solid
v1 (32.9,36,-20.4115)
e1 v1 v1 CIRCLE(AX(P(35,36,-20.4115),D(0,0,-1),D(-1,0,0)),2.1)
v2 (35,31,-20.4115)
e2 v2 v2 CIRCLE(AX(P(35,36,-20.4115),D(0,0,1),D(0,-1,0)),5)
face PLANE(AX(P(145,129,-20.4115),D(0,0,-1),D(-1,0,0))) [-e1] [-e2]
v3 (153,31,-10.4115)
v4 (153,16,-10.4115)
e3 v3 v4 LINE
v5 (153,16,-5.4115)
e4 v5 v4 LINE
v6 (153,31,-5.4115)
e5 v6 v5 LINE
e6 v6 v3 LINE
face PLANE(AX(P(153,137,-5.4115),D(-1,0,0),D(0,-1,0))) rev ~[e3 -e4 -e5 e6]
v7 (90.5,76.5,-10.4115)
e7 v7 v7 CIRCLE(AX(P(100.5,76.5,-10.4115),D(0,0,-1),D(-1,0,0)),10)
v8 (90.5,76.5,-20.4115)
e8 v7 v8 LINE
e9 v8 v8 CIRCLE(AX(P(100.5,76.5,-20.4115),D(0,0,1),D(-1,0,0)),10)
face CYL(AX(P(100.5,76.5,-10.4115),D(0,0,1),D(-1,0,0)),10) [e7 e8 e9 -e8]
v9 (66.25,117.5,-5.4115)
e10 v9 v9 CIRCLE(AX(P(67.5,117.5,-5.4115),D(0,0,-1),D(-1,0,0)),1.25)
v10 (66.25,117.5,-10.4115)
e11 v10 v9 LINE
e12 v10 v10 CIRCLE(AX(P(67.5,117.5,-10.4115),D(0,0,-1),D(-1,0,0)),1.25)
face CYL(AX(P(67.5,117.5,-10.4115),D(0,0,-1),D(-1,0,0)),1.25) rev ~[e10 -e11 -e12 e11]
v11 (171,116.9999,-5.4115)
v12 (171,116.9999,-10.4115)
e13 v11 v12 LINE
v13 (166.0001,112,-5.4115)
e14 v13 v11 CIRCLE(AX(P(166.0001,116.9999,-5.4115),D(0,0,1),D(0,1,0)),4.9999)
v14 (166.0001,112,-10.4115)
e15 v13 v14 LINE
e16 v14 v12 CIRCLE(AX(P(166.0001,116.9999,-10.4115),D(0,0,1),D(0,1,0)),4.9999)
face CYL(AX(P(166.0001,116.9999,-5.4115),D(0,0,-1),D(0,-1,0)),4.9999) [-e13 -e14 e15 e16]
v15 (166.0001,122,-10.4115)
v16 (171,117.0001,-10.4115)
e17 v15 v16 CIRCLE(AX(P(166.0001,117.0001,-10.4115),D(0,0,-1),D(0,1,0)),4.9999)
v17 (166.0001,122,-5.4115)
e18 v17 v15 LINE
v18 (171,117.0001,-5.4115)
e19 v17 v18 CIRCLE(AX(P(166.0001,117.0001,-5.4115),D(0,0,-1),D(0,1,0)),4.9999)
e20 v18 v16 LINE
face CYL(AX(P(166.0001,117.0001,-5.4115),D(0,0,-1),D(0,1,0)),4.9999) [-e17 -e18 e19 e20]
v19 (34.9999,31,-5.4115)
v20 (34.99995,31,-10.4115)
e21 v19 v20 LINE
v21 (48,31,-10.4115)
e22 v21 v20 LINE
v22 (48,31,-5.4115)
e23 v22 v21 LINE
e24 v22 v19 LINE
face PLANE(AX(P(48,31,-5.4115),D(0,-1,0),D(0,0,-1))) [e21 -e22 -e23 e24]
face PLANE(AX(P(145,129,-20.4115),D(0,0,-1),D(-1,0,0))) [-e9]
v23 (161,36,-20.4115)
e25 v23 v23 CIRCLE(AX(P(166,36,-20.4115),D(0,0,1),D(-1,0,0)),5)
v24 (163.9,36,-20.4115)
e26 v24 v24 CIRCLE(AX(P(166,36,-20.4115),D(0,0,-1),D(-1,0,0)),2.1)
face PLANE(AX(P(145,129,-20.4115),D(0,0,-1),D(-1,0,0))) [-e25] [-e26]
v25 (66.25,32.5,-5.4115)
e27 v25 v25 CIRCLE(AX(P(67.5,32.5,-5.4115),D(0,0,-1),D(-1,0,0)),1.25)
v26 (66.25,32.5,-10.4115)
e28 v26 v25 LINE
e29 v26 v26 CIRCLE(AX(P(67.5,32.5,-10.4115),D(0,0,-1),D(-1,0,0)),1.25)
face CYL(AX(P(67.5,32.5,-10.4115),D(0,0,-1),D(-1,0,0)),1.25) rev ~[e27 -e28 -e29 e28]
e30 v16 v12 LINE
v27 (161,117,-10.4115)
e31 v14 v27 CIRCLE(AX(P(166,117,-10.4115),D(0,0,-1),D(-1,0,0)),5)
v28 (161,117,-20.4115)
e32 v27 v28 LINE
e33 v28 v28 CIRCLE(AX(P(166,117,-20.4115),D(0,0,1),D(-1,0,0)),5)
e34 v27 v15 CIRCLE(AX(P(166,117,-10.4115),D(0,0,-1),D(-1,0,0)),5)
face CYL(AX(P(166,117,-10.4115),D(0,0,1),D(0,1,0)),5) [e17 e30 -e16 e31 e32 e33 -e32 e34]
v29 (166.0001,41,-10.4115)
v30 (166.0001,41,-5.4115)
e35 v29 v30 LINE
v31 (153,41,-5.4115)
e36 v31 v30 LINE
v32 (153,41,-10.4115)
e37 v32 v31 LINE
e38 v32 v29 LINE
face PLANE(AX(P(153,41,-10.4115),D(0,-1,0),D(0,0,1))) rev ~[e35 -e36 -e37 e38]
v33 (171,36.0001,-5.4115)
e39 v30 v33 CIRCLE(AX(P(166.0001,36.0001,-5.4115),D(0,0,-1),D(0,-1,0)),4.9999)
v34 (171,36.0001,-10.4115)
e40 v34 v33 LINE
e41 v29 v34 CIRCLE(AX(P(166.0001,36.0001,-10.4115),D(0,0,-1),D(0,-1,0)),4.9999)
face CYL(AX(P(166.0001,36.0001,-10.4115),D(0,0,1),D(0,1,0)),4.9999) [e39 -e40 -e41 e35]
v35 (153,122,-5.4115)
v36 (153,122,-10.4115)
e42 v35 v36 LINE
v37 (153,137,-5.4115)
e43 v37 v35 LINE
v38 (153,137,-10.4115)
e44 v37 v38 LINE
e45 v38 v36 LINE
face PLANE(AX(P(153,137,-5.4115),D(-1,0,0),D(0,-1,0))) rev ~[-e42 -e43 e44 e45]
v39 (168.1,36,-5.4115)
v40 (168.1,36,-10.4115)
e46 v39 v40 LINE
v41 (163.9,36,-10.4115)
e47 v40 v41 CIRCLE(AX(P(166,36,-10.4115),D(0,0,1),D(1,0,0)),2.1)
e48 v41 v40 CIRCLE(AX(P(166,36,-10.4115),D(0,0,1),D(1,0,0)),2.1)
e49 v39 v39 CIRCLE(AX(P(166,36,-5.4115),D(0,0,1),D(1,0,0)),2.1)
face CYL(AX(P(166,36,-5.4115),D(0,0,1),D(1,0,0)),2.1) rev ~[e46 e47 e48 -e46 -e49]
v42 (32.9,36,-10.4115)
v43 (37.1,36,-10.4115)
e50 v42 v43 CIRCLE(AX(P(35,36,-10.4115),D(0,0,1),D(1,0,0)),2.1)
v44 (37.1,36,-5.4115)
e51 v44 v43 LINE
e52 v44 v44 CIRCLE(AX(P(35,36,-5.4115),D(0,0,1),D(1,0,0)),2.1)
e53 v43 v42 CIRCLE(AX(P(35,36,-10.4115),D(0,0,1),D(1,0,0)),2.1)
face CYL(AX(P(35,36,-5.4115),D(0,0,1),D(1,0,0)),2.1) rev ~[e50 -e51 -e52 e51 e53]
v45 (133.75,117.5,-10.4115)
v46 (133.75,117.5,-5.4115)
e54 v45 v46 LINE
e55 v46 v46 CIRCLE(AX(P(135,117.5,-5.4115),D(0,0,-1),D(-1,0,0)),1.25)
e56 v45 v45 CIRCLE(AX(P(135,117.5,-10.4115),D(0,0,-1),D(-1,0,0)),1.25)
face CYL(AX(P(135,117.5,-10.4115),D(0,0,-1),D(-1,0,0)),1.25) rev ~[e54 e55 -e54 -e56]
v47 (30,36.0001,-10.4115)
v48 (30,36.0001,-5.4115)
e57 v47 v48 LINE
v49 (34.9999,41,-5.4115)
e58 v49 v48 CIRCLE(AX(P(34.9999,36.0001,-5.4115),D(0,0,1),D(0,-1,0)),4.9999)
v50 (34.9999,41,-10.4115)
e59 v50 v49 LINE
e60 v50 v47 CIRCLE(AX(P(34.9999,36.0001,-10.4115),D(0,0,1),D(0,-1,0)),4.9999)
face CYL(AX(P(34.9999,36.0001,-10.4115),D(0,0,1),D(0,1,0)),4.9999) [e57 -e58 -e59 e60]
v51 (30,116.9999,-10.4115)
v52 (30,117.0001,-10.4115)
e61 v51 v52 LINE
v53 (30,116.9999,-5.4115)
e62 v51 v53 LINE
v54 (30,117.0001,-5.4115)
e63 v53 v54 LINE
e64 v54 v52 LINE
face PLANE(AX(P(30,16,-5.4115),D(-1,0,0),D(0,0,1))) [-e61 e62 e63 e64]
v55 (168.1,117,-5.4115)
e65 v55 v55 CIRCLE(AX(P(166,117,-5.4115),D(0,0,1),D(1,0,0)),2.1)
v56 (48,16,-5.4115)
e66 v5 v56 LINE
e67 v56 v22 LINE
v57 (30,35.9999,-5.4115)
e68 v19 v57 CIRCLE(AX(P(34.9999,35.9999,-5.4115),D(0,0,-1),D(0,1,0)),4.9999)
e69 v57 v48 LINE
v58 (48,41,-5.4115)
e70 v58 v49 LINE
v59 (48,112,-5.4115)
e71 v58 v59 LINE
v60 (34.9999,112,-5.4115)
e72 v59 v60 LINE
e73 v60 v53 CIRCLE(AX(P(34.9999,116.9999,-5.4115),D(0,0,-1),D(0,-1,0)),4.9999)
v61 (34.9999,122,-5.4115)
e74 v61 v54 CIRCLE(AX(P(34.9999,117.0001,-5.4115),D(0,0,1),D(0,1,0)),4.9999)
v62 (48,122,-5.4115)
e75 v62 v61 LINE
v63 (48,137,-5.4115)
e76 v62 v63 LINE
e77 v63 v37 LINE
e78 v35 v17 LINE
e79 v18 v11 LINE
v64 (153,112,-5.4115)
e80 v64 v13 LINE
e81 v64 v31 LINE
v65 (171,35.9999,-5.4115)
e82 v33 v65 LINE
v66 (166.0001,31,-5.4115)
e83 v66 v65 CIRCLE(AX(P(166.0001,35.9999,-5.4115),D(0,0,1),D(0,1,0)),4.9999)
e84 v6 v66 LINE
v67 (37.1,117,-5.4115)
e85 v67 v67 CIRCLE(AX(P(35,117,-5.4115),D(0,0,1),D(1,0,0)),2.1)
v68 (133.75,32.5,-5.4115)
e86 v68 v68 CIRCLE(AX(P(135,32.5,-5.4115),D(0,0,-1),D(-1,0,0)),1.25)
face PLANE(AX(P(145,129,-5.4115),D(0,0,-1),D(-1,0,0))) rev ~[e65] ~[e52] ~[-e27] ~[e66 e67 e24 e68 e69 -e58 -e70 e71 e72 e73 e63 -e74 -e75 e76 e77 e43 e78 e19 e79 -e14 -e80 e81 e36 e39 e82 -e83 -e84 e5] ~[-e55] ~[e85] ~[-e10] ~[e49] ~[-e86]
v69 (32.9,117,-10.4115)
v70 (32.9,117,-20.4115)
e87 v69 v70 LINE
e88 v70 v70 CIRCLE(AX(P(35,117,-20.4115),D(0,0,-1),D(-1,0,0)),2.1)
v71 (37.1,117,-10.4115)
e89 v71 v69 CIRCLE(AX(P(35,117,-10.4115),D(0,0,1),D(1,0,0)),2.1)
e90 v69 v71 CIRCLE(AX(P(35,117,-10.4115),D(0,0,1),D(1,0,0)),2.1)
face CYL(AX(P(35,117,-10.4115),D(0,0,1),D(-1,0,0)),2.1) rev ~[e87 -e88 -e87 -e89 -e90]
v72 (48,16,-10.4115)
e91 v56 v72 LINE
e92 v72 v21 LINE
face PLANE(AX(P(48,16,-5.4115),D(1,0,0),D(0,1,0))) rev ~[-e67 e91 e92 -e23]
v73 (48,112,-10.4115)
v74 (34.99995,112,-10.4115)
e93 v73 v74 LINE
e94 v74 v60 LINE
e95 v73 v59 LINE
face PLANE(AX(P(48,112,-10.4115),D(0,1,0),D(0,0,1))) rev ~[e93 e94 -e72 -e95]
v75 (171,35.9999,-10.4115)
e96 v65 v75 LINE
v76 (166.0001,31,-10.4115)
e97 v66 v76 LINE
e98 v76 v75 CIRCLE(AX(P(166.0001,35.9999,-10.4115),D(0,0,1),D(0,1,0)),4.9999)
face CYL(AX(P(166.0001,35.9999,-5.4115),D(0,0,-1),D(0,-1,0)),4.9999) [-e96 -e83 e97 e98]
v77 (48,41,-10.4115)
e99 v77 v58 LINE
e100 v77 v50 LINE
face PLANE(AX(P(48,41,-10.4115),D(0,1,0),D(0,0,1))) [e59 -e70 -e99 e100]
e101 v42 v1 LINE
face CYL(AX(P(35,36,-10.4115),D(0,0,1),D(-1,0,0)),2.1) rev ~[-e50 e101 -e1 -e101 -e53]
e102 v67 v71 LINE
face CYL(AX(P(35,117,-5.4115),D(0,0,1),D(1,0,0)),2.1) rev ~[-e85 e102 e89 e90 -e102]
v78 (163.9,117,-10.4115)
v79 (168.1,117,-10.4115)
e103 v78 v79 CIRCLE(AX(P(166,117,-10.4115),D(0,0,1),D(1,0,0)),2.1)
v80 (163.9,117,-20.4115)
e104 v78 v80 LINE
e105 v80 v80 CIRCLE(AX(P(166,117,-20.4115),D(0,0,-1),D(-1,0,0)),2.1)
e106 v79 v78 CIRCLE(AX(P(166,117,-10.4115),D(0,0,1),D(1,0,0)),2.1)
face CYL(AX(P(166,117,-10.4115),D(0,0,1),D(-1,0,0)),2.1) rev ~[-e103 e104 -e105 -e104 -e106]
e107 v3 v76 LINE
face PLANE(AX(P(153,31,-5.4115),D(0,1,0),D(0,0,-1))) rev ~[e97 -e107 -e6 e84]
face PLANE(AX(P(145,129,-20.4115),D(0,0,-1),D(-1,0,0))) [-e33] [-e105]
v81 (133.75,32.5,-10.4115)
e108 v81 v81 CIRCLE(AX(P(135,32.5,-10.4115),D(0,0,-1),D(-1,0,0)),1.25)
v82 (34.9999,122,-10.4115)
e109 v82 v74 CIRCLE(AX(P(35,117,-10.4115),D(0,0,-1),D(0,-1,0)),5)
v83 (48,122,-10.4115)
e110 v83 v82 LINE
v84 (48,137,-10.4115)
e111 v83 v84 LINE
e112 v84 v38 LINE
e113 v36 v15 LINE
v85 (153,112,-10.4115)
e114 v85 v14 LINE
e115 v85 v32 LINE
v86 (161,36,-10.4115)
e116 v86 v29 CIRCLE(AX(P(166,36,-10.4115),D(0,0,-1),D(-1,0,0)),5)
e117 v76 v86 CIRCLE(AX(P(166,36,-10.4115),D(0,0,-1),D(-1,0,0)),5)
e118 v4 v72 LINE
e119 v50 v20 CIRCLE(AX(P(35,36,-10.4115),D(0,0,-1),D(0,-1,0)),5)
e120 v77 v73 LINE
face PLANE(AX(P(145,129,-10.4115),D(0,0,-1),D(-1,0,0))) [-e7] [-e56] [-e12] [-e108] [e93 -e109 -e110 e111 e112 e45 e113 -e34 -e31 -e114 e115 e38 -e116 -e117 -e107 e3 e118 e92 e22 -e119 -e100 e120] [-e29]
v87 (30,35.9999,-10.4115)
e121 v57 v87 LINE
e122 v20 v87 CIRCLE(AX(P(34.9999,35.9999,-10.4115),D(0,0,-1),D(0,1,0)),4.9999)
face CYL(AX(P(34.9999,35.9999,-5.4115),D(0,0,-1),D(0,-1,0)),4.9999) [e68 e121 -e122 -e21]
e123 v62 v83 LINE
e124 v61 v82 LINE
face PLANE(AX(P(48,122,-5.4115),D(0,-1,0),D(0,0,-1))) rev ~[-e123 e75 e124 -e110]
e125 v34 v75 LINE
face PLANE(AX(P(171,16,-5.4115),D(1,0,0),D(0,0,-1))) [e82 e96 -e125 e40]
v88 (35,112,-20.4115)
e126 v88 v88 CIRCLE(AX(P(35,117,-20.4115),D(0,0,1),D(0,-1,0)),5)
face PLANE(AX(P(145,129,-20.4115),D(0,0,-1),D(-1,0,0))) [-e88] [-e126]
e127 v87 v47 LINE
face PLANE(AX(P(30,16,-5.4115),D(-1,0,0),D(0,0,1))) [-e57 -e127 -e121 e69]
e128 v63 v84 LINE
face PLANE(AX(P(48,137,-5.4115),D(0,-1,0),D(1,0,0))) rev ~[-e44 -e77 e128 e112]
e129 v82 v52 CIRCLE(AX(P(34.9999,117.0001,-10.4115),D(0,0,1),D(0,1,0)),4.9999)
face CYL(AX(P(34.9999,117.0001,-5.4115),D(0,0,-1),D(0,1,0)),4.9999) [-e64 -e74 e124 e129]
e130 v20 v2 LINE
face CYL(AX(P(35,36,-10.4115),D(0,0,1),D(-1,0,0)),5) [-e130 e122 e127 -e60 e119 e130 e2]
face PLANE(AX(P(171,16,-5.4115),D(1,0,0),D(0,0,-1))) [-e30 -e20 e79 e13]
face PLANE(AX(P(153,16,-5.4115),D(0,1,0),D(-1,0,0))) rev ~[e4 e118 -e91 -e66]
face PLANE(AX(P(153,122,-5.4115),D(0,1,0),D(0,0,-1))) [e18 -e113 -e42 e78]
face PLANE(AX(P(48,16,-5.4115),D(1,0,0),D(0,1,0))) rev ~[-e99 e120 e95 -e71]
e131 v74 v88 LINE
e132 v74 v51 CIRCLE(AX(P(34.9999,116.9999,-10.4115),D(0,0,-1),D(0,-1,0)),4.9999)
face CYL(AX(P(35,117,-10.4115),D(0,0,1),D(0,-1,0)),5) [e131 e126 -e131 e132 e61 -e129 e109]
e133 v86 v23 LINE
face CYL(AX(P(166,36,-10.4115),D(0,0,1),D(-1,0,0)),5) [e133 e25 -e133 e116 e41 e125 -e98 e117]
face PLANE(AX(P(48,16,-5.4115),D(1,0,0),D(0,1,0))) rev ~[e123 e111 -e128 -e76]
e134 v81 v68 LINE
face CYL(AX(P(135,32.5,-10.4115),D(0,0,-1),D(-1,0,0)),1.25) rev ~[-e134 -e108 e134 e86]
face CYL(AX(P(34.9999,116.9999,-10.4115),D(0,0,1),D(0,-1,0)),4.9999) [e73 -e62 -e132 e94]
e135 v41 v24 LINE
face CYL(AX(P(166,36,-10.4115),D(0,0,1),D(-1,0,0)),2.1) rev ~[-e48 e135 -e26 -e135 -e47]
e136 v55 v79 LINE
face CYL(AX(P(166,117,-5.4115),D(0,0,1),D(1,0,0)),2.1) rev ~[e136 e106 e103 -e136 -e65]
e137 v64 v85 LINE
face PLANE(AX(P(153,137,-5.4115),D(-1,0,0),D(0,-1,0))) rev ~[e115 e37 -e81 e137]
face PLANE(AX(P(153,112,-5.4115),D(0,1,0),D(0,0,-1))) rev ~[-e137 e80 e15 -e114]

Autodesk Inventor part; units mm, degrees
ref_plane "YZ Plane" through (0, 0, 0) normal (1, 0, 0) x (0, 1, 0)
ref_plane "XZ Plane" through (0, 0, 0) normal (0, 1, 0) x (-1, 0, 0)
ref_plane "XY Plane" through (0, 0, 0) normal (0, 0, 1) x (1, 0, 0)
ref_plane "Arbeitsebene1" through (145, 129, -5.4115) normal (0, 0, -1) x (-1, 0, 0)
sketch "Skizze1" plane through (145, 129, -5.4115) normal (0, 0, -1) x (-1, 0, 0)
  line L0 (0, -105) -> (89, -105) projected
  line L1 (89, -105) -> (89, 0) projected
  line L2 (0, 0) -> (0, -105) projected
  line L3 (89, 0) -> (0, 0) projected
  line L4 (89, -105) -> (0, 0)
  line L5 (0, -105) -> (89, 0)
  line L6 (97, 8) -> (-8, 8)
  line L7 (-8, 8) -> (-8, -113)
  line L8 (-8, -113) -> (97, -113)
  line L9 (97, -113) -> (97, 8)
  line L10 (97, 8) -> (-8, -113) construction
  line L11 (-8, 8) -> (97, -113) construction
  point P0 (145, -129)
  point P1 (44.5, -52.5)
  dimension "d1" = 105
  dimension "d2" = 121
extrude "Extrusion1" add sketch "Skizze1" along normal blind 5 contours L5 L4 L0 | L2 L4 L5 | L4 L5 L1 | L3 L5 L4 | L9 L8 L7 L6
sketch "Skizze3" plane through (145, 129, -10.4115) normal (0, 0, -1) x (-1, 0, 0)
  circle A0 centre (10, -96.5) radius 1 projected
  circle A1 centre (10, -11.5) radius 1 projected
  circle A2 centre (77.5, -96.5) radius 1 projected
  circle A3 centre (77.5, -11.5) radius 1 projected
  circle A4 centre (77.5, -11.5) radius 4 projected
  circle A5 centre (77.5, -11.5) radius 1.25
  circle A6 centre (77.5, -96.5) radius 4 projected
  circle A7 centre (77.5, -96.5) radius 1.25
  circle A8 centre (10, -96.5) radius 1.25
  circle A9 centre (10, -11.5) radius 1.25
  point P0 (145, -129)
  dimension "d12" = 2.5
  dimension "d13" = 2.5
  dimension "d14" = 2.5
  dimension "d15" = 2.5
extrude "Extrusion3" cut sketch "Skizze3" against normal blind 25.25 contours A0 | A1 | A2 | A3 | A5 | A7 | A8 | A9
sketch "Skizze5" plane through (48, 16, -5.4115) normal (-1, 0, 0) x (0, 0, 1)
  line L0 (0, 0) -> (0, 121) projected
  line L1 (0, 121) -> (-5, 121) projected
  line L2 (-5, 0) -> (-5, 121) projected
  line L3 (0, 0) -> (-5, 0) projected
  line L4 (0, 121) -> (0, 106)
  line L5 (0, 0) -> (0, 15)
  line L6 (0, 106) -> (-5, 106)
  line L7 (-5, 106) -> (-5, 96)
  line L8 (-5, 96) -> (0, 96)
  line L9 (0, 96) -> (0, 106)
  line L10 (0, 15) -> (-5, 15)
  line L11 (-5, 15) -> (-5, 25)
  line L12 (-5, 25) -> (0, 25)
  line L13 (0, 25) -> (0, 15)
  point P0 (5.4115, -16)
  dimension "d24" = 15
  dimension "d25" = 15
  dimension "d26" = 10
  dimension "d27" = 10
extrude "Extrusion5" add sketch "Skizze5" along normal blind 18 contours L10 L2 L12 L0 | L8 L2 L6 L0
fillet "Rundung1" radius 5 4 edges at (30, 122, -7.9115) (30, 112, -7.9115) (30, 41, -7.9115) (30, 31, -7.9115)
sketch "Skizze6" plane through (153, 16, -5.4115) normal (1, 0, 0) x (0, 0, -1)
  line L0 (0, 121) -> (0, 0) projected
  line L1 (0, 0) -> (5, 0) projected
  line L2 (5, 121) -> (5, 0) projected
  line L3 (0, 121) -> (5, 121) projected
  line L4 (0, 0) -> (0, 15) projected
  line L5 (0, 0) -> (0, 15)
  line L6 (0, 121) -> (0, 106)
  line L7 (0, 15) -> (5, 15)
  line L8 (5, 15) -> (5, 25)
  line L9 (5, 25) -> (0, 25)
  line L10 (0, 25) -> (0, 15)
  line L11 (0, 96) -> (5, 96) projected
  line L12 (0, 106) -> (5, 106)
  line L13 (5, 106) -> (5, 96)
  line L14 (5, 96) -> (0, 96)
  line L15 (0, 96) -> (0, 106)
  point P0 (-5.4115, -16)
  dimension "d31" = 15
  dimension "d32" = 15
  dimension "d33" = 10
  dimension "d34" = 10
extrude "Extrusion6" add sketch "Skizze6" along normal blind 18 contours L12 L2 L11 L0 | L9 L2 L7 L0
fillet "Rundung2" radius 5 4 edges at (171, 112, -7.9115) (171, 122, -7.9115) (171, 31, -7.9115) (171, 41, -7.9115)
sketch "Skizze7" plane through (145, 129, -5.4115) normal (0, 0, 1) x (1, 0, 0)
  arc A0 (21, -98) -> (21, -88) centre (21, -93) ccw projected
  line L0 (8, -88) -> (21, -88) projected
  line L1 (8, -17) -> (8, -88) projected
  line L2 (8, -17) -> (21, -17) projected
  arc A1 (21, -17) -> (21, -7) centre (21, -12) ccw projected
  line L3 (8, -7) -> (21, -7) projected
  line L4 (8, 8) -> (8, -7) projected
  line L5 (-97, 8) -> (8, 8) projected
  line L6 (-97, -7) -> (-97, 8) projected
  line L7 (-97, -7) -> (-110, -7) projected
  arc A2 (-110, -7) -> (-110, -17) centre (-110, -12) ccw projected
  line L8 (-97, -17) -> (-110, -17) projected
  line L9 (-97, -88) -> (-97, -17) projected
  line L10 (-97, -88) -> (-110, -88) projected
  arc A3 (-110, -88) -> (-110, -98) centre (-110, -93) ccw projected
  line L11 (-97, -98) -> (-110, -98) projected
  line L12 (-97, -113) -> (-97, -98) projected
  line L13 (8, -113) -> (-97, -113) projected
  line L14 (8, -98) -> (8, -113) projected
  line L15 (8, -98) -> (21, -98) projected
  circle A4 centre (-110, -12) radius 2.1
  circle A5 centre (21, -12) radius 2.1
  circle A6 centre (21, -93) radius 2.1
  arc A7 (-110, -88) -> (-110, -98) centre (-110, -93) ccw projected
  circle A8 centre (-110, -93) radius 2.1
  point P0 (-145, -129)
  dimension "d38" = 4.2
  dimension "d39" = 4.2
  dimension "d40" = 4.2
  dimension "d41" = 4.2
extrude "Extrusion7" cut sketch "Skizze7" against normal blind 18 contours A4 | A5 | A6 | A8
sketch "Skizze8" plane through (145, 129, -10.4115) normal (0, 0, -1) x (-1, 0, 0)
  circle A0 centre (-21, -93) radius 2.1 projected
  circle A1 centre (-21, -12) radius 2.1 projected
  circle A2 centre (110, -93) radius 2.1 projected
  circle A3 centre (110, -12) radius 2.1 projected
  arc A4 (-21, -88) -> (-21, -98) centre (-21, -93) ccw projected
  line L0 (-8, -98) -> (-21, -98) projected
  line L1 (-8, -98) -> (-8, -113) projected
  line L2 (-8, -113) -> (97, -113) projected
  line L3 (97, -113) -> (97, -98) projected
  line L4 (97, -98) -> (110, -98) projected
  arc A5 (110, -98) -> (110, -88) centre (110, -93) ccw projected
  line L5 (97, -88) -> (110, -88) projected
  line L6 (97, -88) -> (97, -17) projected
  line L7 (97, -17) -> (110, -17) projected
  arc A6 (110, -17) -> (110, -7) centre (110, -12) ccw projected
  line L8 (97, -7) -> (110, -7) projected
  line L9 (97, -7) -> (97, 8) projected
  line L10 (97, 8) -> (-8, 8) projected
  line L11 (-8, 8) -> (-8, -7) projected
  line L12 (-8, -7) -> (-21, -7) projected
  arc A7 (-21, -7) -> (-21, -17) centre (-21, -12) ccw projected
  line L13 (-8, -17) -> (-21, -17) projected
  line L14 (-8, -17) -> (-8, -88) projected
  line L15 (-8, -88) -> (-21, -88) projected
  circle A8 centre (-21, -93) radius 5
  circle A9 centre (-21, -12) radius 5
  circle A10 centre (110, -12) radius 5
  circle A11 centre (110, -93) radius 5
  line L16 (97, -113) -> (-8, 8)
  circle A12 centre (44.5, -52.5) radius 10
  point P0 (145, -129)
  dimension "d44" = 20
extrude "Extrusion8" add sketch "Skizze8" along normal blind 10 contours A8 A4 | A7 A9 | A12 L16 | L16 A12 | A11 A5 | A6 A10
properties part number "PCB_Gehaeuse_o"
